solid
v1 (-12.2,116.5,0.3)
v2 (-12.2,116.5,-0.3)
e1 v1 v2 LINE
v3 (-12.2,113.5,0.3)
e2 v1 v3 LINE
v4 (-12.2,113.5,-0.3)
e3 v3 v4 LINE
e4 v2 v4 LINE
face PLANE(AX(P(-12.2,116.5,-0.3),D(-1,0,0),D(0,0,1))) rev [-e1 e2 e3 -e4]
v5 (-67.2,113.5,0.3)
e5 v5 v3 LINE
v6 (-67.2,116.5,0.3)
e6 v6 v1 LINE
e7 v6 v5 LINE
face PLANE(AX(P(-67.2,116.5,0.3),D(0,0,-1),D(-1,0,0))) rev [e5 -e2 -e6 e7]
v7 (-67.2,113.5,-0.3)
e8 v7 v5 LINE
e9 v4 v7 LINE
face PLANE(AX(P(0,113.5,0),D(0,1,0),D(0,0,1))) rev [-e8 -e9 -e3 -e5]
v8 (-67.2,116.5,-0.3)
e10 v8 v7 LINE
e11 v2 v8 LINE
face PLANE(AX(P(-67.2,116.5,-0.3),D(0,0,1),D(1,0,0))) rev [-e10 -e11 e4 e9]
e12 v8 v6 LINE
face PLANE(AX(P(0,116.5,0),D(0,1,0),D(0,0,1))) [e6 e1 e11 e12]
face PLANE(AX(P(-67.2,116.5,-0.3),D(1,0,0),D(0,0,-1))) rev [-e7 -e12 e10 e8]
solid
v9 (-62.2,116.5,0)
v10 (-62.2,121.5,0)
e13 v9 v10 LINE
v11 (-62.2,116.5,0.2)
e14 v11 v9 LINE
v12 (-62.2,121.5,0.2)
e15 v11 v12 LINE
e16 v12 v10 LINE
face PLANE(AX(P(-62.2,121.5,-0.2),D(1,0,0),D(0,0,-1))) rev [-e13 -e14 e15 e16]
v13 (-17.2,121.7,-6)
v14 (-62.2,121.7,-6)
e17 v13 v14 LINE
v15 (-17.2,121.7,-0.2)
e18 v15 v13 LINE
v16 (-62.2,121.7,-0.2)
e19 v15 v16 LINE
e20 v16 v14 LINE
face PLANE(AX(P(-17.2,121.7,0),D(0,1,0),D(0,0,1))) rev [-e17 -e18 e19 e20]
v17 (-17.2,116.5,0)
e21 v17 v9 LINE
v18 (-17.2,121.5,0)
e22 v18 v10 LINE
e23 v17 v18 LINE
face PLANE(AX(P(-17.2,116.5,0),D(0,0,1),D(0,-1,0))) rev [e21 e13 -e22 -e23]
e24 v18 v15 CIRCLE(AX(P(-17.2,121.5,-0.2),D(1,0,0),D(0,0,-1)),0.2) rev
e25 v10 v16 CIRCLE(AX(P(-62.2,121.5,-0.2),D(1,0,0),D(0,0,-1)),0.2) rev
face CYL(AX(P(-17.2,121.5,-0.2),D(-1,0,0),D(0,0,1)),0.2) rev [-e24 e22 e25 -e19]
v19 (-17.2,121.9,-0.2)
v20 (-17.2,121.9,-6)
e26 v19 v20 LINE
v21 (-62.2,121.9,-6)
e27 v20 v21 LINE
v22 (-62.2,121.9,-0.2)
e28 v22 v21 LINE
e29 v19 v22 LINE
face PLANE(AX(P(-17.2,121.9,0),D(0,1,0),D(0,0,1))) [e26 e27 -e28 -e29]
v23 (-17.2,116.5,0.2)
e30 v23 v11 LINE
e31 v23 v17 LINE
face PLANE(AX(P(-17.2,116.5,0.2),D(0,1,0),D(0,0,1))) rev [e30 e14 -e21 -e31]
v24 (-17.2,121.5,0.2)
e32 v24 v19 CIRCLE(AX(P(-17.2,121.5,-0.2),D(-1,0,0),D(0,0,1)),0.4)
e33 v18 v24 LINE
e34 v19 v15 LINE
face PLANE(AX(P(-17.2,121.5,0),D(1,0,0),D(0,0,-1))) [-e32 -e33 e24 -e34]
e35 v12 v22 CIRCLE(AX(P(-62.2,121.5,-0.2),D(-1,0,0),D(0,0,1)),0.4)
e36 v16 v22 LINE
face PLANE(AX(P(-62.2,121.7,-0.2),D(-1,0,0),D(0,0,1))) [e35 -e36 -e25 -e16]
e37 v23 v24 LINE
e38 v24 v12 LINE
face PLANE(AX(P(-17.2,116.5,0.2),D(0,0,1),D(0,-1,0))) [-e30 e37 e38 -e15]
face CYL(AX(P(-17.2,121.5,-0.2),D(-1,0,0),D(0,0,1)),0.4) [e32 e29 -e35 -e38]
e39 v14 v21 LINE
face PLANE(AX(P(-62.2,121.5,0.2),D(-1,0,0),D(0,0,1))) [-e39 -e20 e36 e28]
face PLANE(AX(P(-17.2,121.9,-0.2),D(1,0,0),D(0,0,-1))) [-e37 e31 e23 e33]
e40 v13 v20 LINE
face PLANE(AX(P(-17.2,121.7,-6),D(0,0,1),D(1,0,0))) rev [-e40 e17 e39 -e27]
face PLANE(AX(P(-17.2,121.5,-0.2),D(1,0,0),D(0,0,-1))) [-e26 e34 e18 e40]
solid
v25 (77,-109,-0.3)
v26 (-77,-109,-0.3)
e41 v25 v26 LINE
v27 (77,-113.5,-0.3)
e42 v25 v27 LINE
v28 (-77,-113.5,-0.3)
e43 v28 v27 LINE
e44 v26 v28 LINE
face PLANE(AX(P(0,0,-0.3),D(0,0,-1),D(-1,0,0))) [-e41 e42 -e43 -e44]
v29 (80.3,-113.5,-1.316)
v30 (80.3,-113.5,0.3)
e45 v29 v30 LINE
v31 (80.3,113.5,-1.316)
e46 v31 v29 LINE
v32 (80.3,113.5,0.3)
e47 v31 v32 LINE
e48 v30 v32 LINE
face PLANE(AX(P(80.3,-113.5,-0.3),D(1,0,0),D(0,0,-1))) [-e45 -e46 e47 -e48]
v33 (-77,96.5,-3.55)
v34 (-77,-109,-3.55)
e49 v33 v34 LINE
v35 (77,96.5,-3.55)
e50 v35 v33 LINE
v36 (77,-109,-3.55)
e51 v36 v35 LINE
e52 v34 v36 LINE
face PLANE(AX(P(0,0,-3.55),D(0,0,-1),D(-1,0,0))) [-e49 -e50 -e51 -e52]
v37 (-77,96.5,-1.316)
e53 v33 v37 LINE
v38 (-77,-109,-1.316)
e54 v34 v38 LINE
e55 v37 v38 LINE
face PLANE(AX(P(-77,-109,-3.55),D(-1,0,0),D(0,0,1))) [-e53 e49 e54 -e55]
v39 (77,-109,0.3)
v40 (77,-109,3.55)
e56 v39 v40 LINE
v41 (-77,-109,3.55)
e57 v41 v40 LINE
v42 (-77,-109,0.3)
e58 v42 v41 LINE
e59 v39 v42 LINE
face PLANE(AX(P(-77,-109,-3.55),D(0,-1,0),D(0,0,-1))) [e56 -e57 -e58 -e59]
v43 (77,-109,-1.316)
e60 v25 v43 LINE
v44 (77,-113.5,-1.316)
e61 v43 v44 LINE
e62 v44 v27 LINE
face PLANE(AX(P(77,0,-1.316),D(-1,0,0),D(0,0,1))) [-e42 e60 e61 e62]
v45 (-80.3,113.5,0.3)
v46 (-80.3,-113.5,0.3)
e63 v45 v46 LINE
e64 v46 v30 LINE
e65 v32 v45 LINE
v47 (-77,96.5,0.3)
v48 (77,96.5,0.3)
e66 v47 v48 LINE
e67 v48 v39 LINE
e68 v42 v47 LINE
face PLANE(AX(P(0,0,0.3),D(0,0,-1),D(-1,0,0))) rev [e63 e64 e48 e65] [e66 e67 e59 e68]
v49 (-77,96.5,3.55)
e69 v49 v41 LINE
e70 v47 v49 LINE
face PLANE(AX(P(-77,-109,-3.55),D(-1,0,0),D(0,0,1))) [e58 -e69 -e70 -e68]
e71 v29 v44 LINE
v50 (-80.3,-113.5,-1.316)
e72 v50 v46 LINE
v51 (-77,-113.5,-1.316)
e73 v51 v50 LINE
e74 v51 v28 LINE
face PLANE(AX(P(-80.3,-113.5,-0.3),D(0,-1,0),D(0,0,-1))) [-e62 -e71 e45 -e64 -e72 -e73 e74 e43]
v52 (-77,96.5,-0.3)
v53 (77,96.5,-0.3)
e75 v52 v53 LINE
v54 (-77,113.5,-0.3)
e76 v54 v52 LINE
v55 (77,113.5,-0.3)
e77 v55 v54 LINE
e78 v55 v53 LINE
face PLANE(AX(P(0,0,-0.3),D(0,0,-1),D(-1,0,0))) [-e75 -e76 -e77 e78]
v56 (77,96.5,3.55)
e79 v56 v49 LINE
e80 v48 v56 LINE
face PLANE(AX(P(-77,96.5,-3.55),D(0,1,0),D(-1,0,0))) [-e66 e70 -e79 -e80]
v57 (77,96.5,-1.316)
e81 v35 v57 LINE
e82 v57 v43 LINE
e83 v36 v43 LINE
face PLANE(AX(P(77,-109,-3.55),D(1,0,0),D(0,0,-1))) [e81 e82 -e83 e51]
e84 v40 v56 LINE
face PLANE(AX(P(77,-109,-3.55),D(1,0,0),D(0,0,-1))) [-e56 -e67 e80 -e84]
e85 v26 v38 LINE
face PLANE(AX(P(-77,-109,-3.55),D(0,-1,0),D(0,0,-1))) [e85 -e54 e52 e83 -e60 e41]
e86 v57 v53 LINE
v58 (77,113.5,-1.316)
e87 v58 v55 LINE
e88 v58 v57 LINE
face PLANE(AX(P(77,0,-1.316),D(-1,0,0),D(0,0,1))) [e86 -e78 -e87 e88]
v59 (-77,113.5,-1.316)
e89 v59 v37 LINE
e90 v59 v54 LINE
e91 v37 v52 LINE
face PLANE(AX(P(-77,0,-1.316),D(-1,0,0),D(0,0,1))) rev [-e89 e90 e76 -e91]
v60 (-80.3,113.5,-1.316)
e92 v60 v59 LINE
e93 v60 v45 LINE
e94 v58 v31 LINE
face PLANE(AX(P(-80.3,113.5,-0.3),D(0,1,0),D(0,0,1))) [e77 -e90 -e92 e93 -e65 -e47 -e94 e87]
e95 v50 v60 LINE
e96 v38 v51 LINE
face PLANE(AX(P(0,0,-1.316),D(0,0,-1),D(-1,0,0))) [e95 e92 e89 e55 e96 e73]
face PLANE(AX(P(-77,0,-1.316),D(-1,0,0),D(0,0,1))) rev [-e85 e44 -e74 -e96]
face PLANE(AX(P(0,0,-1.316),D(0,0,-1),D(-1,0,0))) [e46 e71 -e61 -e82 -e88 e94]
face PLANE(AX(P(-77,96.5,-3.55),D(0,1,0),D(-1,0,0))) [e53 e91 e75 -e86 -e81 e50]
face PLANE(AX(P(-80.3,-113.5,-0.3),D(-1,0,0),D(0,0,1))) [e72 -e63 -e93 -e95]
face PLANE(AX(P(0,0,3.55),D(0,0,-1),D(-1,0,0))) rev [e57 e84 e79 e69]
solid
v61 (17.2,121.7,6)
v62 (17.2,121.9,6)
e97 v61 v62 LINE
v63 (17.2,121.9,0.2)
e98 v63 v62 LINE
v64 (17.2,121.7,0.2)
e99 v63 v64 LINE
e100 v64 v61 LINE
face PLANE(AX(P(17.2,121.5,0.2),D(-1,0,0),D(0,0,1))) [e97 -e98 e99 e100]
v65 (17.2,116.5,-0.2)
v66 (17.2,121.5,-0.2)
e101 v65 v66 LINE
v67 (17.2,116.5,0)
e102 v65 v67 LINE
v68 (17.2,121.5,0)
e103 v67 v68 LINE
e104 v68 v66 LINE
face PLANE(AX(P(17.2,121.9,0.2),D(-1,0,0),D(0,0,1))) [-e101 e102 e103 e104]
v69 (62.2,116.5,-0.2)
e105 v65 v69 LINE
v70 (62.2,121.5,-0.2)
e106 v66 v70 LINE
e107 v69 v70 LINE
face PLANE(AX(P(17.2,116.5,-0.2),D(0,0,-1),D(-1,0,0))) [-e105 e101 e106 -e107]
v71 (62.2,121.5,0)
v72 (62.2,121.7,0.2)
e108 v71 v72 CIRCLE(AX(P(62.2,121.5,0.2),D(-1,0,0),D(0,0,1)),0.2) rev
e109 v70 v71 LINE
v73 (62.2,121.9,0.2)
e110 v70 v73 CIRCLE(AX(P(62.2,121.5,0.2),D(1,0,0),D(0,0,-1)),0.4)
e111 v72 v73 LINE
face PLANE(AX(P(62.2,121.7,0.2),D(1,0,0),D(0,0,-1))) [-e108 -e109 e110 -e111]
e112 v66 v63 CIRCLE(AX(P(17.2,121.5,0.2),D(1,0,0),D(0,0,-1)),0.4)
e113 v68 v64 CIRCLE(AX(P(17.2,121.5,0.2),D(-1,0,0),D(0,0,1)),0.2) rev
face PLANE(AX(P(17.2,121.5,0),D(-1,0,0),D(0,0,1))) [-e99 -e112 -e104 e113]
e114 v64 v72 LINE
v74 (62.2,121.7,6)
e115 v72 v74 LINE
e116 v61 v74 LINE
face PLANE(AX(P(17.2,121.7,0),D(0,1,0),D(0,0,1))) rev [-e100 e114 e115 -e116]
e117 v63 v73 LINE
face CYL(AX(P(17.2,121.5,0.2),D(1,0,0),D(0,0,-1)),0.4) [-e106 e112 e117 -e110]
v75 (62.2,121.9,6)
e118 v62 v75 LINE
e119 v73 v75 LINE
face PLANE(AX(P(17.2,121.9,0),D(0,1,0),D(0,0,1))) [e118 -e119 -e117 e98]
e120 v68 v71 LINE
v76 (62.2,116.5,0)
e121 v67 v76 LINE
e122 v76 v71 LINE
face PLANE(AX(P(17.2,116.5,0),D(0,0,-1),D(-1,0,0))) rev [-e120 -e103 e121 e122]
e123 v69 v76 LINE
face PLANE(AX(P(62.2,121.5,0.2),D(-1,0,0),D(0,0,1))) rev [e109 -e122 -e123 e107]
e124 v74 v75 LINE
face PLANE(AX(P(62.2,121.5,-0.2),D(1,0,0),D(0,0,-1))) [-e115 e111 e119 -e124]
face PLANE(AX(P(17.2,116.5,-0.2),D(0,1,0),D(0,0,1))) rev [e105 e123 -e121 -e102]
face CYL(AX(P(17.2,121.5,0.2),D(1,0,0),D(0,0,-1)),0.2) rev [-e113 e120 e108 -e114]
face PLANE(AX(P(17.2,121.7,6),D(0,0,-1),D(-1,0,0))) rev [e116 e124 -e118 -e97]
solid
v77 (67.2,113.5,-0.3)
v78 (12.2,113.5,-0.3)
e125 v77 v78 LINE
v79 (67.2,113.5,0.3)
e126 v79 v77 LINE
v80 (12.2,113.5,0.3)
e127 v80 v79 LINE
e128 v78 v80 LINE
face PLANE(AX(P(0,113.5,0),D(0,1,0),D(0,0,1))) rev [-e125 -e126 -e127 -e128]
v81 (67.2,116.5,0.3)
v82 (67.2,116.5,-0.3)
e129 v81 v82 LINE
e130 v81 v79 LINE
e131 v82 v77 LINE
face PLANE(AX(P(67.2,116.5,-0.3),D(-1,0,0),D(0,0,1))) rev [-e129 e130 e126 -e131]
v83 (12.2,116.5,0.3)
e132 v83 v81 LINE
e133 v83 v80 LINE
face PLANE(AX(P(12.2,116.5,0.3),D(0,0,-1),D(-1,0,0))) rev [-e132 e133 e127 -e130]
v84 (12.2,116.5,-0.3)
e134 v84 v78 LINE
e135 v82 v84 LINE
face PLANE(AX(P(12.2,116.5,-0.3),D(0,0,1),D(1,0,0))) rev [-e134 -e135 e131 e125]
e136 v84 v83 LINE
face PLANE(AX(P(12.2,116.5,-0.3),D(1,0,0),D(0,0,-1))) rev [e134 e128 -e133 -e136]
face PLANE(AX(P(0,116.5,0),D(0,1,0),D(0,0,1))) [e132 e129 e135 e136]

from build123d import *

# Parameters (mm, degrees)
INSULATION_DEPTH      = 0.3
INSULATION_DEPTH_BACK = 0.3
SKETCH1_W             = 160.6
SKETCH1_H             = 227
MAIN_BODY_DEPTH       = 3.55
MAIN_BODY_DEPTH_BACK  = 3.55
SKETCH2_W             = 154
SKETCH2_H             = 205.5
SIDE_FOLDS_DEPTH      = 1.016
SKETCH114_W           = 55
SKETCH114_H           = 0.6
BOSS_EXTRUDE1_DEPTH   = 3
BOSS_EXTRUDE1_2_DEPTH = 3
BASE_FLANGE1_DEPTH    = 45
BASE_FLANGE2_DEPTH    = 45


# Sheet-metal steps are written as plain solids
with BuildPart() as part:
    # Sketch1 → Insulation (new, two sides: drawn at the far end of the back side and taken through both)
    with BuildSketch(Plane.XY.offset(-INSULATION_DEPTH_BACK)):
        Rectangle(SKETCH1_W, SKETCH1_H)
    extrude(amount=INSULATION_DEPTH + INSULATION_DEPTH_BACK)

    # Sketch2 → Main Body (add, two sides: drawn at the far end of the back side and taken through both)
    with BuildSketch(Plane.XY.offset(-MAIN_BODY_DEPTH_BACK)):
        with Locations((0, -6.25)):
            Rectangle(SKETCH2_W, SKETCH2_H)
    extrude(amount=MAIN_BODY_DEPTH + MAIN_BODY_DEPTH_BACK)

    # Sketch5 → Side Folds (add)
    with BuildSketch(Plane(origin=(0, 0, -0.3), x_dir=(-1, 0, 0), z_dir=(0, 0, -1))):
        Polygon((-77, -109), (-77, 96.5), (-77, 113.5), (-80.3, 113.5), (-80.3, -113.5), (-77, -113.5), align=None)
        Polygon((77, 113.5), (77, 96.5), (77, -109), (77, -113.5), (80.3, -113.5), (80.3, 113.5), align=None)
    extrude(amount=SIDE_FOLDS_DEPTH)


with BuildPart() as body_2:
    # Sketch114 → Boss-Extrude1 (new body)
    with BuildSketch(Plane(origin=(0, 113.5, 0), x_dir=(1, 0, 0), z_dir=(0, 1, 0))):
        with Locations((-39.7, 0)):
            Rectangle(SKETCH114_W, SKETCH114_H)
    extrude(amount=BOSS_EXTRUDE1_DEPTH)


with BuildPart() as body_3:
    # Sketch114 → Boss-Extrude1 2 (new body)
    with BuildSketch(Plane(origin=(0, 113.5, 0), x_dir=(1, 0, 0), z_dir=(0, 1, 0))):
        with Locations((39.7, 0)):
            Rectangle(SKETCH114_W, SKETCH114_H)
    extrude(amount=BOSS_EXTRUDE1_2_DEPTH)


with BuildPart() as body_4:
    # Sketch115 → Base-Flange1 (new body)
    with BuildSketch(Plane.ZY.offset(62.2)):
        with BuildLine():
            Line((0, 116.5), (0, 121.5))
            ThreePointArc((0, 121.5), (-0.058578644, 121.641421356), (-0.2, 121.7))
            Line((-0.2, 121.7), (-6, 121.7))
            Line((-6, 121.7), (-6, 121.9))
            Line((-6, 121.9), (-0.2, 121.9))
            ThreePointArc((-0.2, 121.9), (0.082842712, 121.782842712), (0.2, 121.5))
            Line((0.2, 121.5), (0.2, 116.5))
            Line((0.2, 116.5), (0, 116.5))
        make_face()
    extrude(amount=-BASE_FLANGE1_DEPTH)


with BuildPart() as body_5:
    # Sketch120 → Base-Flange2 (new body)
    with BuildSketch(Plane(origin=(62.2, 0, 0), x_dir=(0, 0, -1), z_dir=(1, 0, 0))):
        with BuildLine():
            Line((0, 116.5), (0, 121.5))
            ThreePointArc((0, 121.5), (-0.058578644, 121.641421356), (-0.2, 121.7))
            Line((-0.2, 121.7), (-6, 121.7))
            Line((-6, 121.7), (-6, 121.9))
            Line((-6, 121.9), (-0.2, 121.9))
            ThreePointArc((-0.2, 121.9), (0.082842712, 121.782842712), (0.2, 121.5))
            Line((0.2, 121.5), (0.2, 116.5))
            Line((0.2, 116.5), (0, 116.5))
        make_face()
    extrude(amount=-BASE_FLANGE2_DEPTH)


solid = Compound([part.part, body_2.part, body_3.part, body_4.part, body_5.part])
